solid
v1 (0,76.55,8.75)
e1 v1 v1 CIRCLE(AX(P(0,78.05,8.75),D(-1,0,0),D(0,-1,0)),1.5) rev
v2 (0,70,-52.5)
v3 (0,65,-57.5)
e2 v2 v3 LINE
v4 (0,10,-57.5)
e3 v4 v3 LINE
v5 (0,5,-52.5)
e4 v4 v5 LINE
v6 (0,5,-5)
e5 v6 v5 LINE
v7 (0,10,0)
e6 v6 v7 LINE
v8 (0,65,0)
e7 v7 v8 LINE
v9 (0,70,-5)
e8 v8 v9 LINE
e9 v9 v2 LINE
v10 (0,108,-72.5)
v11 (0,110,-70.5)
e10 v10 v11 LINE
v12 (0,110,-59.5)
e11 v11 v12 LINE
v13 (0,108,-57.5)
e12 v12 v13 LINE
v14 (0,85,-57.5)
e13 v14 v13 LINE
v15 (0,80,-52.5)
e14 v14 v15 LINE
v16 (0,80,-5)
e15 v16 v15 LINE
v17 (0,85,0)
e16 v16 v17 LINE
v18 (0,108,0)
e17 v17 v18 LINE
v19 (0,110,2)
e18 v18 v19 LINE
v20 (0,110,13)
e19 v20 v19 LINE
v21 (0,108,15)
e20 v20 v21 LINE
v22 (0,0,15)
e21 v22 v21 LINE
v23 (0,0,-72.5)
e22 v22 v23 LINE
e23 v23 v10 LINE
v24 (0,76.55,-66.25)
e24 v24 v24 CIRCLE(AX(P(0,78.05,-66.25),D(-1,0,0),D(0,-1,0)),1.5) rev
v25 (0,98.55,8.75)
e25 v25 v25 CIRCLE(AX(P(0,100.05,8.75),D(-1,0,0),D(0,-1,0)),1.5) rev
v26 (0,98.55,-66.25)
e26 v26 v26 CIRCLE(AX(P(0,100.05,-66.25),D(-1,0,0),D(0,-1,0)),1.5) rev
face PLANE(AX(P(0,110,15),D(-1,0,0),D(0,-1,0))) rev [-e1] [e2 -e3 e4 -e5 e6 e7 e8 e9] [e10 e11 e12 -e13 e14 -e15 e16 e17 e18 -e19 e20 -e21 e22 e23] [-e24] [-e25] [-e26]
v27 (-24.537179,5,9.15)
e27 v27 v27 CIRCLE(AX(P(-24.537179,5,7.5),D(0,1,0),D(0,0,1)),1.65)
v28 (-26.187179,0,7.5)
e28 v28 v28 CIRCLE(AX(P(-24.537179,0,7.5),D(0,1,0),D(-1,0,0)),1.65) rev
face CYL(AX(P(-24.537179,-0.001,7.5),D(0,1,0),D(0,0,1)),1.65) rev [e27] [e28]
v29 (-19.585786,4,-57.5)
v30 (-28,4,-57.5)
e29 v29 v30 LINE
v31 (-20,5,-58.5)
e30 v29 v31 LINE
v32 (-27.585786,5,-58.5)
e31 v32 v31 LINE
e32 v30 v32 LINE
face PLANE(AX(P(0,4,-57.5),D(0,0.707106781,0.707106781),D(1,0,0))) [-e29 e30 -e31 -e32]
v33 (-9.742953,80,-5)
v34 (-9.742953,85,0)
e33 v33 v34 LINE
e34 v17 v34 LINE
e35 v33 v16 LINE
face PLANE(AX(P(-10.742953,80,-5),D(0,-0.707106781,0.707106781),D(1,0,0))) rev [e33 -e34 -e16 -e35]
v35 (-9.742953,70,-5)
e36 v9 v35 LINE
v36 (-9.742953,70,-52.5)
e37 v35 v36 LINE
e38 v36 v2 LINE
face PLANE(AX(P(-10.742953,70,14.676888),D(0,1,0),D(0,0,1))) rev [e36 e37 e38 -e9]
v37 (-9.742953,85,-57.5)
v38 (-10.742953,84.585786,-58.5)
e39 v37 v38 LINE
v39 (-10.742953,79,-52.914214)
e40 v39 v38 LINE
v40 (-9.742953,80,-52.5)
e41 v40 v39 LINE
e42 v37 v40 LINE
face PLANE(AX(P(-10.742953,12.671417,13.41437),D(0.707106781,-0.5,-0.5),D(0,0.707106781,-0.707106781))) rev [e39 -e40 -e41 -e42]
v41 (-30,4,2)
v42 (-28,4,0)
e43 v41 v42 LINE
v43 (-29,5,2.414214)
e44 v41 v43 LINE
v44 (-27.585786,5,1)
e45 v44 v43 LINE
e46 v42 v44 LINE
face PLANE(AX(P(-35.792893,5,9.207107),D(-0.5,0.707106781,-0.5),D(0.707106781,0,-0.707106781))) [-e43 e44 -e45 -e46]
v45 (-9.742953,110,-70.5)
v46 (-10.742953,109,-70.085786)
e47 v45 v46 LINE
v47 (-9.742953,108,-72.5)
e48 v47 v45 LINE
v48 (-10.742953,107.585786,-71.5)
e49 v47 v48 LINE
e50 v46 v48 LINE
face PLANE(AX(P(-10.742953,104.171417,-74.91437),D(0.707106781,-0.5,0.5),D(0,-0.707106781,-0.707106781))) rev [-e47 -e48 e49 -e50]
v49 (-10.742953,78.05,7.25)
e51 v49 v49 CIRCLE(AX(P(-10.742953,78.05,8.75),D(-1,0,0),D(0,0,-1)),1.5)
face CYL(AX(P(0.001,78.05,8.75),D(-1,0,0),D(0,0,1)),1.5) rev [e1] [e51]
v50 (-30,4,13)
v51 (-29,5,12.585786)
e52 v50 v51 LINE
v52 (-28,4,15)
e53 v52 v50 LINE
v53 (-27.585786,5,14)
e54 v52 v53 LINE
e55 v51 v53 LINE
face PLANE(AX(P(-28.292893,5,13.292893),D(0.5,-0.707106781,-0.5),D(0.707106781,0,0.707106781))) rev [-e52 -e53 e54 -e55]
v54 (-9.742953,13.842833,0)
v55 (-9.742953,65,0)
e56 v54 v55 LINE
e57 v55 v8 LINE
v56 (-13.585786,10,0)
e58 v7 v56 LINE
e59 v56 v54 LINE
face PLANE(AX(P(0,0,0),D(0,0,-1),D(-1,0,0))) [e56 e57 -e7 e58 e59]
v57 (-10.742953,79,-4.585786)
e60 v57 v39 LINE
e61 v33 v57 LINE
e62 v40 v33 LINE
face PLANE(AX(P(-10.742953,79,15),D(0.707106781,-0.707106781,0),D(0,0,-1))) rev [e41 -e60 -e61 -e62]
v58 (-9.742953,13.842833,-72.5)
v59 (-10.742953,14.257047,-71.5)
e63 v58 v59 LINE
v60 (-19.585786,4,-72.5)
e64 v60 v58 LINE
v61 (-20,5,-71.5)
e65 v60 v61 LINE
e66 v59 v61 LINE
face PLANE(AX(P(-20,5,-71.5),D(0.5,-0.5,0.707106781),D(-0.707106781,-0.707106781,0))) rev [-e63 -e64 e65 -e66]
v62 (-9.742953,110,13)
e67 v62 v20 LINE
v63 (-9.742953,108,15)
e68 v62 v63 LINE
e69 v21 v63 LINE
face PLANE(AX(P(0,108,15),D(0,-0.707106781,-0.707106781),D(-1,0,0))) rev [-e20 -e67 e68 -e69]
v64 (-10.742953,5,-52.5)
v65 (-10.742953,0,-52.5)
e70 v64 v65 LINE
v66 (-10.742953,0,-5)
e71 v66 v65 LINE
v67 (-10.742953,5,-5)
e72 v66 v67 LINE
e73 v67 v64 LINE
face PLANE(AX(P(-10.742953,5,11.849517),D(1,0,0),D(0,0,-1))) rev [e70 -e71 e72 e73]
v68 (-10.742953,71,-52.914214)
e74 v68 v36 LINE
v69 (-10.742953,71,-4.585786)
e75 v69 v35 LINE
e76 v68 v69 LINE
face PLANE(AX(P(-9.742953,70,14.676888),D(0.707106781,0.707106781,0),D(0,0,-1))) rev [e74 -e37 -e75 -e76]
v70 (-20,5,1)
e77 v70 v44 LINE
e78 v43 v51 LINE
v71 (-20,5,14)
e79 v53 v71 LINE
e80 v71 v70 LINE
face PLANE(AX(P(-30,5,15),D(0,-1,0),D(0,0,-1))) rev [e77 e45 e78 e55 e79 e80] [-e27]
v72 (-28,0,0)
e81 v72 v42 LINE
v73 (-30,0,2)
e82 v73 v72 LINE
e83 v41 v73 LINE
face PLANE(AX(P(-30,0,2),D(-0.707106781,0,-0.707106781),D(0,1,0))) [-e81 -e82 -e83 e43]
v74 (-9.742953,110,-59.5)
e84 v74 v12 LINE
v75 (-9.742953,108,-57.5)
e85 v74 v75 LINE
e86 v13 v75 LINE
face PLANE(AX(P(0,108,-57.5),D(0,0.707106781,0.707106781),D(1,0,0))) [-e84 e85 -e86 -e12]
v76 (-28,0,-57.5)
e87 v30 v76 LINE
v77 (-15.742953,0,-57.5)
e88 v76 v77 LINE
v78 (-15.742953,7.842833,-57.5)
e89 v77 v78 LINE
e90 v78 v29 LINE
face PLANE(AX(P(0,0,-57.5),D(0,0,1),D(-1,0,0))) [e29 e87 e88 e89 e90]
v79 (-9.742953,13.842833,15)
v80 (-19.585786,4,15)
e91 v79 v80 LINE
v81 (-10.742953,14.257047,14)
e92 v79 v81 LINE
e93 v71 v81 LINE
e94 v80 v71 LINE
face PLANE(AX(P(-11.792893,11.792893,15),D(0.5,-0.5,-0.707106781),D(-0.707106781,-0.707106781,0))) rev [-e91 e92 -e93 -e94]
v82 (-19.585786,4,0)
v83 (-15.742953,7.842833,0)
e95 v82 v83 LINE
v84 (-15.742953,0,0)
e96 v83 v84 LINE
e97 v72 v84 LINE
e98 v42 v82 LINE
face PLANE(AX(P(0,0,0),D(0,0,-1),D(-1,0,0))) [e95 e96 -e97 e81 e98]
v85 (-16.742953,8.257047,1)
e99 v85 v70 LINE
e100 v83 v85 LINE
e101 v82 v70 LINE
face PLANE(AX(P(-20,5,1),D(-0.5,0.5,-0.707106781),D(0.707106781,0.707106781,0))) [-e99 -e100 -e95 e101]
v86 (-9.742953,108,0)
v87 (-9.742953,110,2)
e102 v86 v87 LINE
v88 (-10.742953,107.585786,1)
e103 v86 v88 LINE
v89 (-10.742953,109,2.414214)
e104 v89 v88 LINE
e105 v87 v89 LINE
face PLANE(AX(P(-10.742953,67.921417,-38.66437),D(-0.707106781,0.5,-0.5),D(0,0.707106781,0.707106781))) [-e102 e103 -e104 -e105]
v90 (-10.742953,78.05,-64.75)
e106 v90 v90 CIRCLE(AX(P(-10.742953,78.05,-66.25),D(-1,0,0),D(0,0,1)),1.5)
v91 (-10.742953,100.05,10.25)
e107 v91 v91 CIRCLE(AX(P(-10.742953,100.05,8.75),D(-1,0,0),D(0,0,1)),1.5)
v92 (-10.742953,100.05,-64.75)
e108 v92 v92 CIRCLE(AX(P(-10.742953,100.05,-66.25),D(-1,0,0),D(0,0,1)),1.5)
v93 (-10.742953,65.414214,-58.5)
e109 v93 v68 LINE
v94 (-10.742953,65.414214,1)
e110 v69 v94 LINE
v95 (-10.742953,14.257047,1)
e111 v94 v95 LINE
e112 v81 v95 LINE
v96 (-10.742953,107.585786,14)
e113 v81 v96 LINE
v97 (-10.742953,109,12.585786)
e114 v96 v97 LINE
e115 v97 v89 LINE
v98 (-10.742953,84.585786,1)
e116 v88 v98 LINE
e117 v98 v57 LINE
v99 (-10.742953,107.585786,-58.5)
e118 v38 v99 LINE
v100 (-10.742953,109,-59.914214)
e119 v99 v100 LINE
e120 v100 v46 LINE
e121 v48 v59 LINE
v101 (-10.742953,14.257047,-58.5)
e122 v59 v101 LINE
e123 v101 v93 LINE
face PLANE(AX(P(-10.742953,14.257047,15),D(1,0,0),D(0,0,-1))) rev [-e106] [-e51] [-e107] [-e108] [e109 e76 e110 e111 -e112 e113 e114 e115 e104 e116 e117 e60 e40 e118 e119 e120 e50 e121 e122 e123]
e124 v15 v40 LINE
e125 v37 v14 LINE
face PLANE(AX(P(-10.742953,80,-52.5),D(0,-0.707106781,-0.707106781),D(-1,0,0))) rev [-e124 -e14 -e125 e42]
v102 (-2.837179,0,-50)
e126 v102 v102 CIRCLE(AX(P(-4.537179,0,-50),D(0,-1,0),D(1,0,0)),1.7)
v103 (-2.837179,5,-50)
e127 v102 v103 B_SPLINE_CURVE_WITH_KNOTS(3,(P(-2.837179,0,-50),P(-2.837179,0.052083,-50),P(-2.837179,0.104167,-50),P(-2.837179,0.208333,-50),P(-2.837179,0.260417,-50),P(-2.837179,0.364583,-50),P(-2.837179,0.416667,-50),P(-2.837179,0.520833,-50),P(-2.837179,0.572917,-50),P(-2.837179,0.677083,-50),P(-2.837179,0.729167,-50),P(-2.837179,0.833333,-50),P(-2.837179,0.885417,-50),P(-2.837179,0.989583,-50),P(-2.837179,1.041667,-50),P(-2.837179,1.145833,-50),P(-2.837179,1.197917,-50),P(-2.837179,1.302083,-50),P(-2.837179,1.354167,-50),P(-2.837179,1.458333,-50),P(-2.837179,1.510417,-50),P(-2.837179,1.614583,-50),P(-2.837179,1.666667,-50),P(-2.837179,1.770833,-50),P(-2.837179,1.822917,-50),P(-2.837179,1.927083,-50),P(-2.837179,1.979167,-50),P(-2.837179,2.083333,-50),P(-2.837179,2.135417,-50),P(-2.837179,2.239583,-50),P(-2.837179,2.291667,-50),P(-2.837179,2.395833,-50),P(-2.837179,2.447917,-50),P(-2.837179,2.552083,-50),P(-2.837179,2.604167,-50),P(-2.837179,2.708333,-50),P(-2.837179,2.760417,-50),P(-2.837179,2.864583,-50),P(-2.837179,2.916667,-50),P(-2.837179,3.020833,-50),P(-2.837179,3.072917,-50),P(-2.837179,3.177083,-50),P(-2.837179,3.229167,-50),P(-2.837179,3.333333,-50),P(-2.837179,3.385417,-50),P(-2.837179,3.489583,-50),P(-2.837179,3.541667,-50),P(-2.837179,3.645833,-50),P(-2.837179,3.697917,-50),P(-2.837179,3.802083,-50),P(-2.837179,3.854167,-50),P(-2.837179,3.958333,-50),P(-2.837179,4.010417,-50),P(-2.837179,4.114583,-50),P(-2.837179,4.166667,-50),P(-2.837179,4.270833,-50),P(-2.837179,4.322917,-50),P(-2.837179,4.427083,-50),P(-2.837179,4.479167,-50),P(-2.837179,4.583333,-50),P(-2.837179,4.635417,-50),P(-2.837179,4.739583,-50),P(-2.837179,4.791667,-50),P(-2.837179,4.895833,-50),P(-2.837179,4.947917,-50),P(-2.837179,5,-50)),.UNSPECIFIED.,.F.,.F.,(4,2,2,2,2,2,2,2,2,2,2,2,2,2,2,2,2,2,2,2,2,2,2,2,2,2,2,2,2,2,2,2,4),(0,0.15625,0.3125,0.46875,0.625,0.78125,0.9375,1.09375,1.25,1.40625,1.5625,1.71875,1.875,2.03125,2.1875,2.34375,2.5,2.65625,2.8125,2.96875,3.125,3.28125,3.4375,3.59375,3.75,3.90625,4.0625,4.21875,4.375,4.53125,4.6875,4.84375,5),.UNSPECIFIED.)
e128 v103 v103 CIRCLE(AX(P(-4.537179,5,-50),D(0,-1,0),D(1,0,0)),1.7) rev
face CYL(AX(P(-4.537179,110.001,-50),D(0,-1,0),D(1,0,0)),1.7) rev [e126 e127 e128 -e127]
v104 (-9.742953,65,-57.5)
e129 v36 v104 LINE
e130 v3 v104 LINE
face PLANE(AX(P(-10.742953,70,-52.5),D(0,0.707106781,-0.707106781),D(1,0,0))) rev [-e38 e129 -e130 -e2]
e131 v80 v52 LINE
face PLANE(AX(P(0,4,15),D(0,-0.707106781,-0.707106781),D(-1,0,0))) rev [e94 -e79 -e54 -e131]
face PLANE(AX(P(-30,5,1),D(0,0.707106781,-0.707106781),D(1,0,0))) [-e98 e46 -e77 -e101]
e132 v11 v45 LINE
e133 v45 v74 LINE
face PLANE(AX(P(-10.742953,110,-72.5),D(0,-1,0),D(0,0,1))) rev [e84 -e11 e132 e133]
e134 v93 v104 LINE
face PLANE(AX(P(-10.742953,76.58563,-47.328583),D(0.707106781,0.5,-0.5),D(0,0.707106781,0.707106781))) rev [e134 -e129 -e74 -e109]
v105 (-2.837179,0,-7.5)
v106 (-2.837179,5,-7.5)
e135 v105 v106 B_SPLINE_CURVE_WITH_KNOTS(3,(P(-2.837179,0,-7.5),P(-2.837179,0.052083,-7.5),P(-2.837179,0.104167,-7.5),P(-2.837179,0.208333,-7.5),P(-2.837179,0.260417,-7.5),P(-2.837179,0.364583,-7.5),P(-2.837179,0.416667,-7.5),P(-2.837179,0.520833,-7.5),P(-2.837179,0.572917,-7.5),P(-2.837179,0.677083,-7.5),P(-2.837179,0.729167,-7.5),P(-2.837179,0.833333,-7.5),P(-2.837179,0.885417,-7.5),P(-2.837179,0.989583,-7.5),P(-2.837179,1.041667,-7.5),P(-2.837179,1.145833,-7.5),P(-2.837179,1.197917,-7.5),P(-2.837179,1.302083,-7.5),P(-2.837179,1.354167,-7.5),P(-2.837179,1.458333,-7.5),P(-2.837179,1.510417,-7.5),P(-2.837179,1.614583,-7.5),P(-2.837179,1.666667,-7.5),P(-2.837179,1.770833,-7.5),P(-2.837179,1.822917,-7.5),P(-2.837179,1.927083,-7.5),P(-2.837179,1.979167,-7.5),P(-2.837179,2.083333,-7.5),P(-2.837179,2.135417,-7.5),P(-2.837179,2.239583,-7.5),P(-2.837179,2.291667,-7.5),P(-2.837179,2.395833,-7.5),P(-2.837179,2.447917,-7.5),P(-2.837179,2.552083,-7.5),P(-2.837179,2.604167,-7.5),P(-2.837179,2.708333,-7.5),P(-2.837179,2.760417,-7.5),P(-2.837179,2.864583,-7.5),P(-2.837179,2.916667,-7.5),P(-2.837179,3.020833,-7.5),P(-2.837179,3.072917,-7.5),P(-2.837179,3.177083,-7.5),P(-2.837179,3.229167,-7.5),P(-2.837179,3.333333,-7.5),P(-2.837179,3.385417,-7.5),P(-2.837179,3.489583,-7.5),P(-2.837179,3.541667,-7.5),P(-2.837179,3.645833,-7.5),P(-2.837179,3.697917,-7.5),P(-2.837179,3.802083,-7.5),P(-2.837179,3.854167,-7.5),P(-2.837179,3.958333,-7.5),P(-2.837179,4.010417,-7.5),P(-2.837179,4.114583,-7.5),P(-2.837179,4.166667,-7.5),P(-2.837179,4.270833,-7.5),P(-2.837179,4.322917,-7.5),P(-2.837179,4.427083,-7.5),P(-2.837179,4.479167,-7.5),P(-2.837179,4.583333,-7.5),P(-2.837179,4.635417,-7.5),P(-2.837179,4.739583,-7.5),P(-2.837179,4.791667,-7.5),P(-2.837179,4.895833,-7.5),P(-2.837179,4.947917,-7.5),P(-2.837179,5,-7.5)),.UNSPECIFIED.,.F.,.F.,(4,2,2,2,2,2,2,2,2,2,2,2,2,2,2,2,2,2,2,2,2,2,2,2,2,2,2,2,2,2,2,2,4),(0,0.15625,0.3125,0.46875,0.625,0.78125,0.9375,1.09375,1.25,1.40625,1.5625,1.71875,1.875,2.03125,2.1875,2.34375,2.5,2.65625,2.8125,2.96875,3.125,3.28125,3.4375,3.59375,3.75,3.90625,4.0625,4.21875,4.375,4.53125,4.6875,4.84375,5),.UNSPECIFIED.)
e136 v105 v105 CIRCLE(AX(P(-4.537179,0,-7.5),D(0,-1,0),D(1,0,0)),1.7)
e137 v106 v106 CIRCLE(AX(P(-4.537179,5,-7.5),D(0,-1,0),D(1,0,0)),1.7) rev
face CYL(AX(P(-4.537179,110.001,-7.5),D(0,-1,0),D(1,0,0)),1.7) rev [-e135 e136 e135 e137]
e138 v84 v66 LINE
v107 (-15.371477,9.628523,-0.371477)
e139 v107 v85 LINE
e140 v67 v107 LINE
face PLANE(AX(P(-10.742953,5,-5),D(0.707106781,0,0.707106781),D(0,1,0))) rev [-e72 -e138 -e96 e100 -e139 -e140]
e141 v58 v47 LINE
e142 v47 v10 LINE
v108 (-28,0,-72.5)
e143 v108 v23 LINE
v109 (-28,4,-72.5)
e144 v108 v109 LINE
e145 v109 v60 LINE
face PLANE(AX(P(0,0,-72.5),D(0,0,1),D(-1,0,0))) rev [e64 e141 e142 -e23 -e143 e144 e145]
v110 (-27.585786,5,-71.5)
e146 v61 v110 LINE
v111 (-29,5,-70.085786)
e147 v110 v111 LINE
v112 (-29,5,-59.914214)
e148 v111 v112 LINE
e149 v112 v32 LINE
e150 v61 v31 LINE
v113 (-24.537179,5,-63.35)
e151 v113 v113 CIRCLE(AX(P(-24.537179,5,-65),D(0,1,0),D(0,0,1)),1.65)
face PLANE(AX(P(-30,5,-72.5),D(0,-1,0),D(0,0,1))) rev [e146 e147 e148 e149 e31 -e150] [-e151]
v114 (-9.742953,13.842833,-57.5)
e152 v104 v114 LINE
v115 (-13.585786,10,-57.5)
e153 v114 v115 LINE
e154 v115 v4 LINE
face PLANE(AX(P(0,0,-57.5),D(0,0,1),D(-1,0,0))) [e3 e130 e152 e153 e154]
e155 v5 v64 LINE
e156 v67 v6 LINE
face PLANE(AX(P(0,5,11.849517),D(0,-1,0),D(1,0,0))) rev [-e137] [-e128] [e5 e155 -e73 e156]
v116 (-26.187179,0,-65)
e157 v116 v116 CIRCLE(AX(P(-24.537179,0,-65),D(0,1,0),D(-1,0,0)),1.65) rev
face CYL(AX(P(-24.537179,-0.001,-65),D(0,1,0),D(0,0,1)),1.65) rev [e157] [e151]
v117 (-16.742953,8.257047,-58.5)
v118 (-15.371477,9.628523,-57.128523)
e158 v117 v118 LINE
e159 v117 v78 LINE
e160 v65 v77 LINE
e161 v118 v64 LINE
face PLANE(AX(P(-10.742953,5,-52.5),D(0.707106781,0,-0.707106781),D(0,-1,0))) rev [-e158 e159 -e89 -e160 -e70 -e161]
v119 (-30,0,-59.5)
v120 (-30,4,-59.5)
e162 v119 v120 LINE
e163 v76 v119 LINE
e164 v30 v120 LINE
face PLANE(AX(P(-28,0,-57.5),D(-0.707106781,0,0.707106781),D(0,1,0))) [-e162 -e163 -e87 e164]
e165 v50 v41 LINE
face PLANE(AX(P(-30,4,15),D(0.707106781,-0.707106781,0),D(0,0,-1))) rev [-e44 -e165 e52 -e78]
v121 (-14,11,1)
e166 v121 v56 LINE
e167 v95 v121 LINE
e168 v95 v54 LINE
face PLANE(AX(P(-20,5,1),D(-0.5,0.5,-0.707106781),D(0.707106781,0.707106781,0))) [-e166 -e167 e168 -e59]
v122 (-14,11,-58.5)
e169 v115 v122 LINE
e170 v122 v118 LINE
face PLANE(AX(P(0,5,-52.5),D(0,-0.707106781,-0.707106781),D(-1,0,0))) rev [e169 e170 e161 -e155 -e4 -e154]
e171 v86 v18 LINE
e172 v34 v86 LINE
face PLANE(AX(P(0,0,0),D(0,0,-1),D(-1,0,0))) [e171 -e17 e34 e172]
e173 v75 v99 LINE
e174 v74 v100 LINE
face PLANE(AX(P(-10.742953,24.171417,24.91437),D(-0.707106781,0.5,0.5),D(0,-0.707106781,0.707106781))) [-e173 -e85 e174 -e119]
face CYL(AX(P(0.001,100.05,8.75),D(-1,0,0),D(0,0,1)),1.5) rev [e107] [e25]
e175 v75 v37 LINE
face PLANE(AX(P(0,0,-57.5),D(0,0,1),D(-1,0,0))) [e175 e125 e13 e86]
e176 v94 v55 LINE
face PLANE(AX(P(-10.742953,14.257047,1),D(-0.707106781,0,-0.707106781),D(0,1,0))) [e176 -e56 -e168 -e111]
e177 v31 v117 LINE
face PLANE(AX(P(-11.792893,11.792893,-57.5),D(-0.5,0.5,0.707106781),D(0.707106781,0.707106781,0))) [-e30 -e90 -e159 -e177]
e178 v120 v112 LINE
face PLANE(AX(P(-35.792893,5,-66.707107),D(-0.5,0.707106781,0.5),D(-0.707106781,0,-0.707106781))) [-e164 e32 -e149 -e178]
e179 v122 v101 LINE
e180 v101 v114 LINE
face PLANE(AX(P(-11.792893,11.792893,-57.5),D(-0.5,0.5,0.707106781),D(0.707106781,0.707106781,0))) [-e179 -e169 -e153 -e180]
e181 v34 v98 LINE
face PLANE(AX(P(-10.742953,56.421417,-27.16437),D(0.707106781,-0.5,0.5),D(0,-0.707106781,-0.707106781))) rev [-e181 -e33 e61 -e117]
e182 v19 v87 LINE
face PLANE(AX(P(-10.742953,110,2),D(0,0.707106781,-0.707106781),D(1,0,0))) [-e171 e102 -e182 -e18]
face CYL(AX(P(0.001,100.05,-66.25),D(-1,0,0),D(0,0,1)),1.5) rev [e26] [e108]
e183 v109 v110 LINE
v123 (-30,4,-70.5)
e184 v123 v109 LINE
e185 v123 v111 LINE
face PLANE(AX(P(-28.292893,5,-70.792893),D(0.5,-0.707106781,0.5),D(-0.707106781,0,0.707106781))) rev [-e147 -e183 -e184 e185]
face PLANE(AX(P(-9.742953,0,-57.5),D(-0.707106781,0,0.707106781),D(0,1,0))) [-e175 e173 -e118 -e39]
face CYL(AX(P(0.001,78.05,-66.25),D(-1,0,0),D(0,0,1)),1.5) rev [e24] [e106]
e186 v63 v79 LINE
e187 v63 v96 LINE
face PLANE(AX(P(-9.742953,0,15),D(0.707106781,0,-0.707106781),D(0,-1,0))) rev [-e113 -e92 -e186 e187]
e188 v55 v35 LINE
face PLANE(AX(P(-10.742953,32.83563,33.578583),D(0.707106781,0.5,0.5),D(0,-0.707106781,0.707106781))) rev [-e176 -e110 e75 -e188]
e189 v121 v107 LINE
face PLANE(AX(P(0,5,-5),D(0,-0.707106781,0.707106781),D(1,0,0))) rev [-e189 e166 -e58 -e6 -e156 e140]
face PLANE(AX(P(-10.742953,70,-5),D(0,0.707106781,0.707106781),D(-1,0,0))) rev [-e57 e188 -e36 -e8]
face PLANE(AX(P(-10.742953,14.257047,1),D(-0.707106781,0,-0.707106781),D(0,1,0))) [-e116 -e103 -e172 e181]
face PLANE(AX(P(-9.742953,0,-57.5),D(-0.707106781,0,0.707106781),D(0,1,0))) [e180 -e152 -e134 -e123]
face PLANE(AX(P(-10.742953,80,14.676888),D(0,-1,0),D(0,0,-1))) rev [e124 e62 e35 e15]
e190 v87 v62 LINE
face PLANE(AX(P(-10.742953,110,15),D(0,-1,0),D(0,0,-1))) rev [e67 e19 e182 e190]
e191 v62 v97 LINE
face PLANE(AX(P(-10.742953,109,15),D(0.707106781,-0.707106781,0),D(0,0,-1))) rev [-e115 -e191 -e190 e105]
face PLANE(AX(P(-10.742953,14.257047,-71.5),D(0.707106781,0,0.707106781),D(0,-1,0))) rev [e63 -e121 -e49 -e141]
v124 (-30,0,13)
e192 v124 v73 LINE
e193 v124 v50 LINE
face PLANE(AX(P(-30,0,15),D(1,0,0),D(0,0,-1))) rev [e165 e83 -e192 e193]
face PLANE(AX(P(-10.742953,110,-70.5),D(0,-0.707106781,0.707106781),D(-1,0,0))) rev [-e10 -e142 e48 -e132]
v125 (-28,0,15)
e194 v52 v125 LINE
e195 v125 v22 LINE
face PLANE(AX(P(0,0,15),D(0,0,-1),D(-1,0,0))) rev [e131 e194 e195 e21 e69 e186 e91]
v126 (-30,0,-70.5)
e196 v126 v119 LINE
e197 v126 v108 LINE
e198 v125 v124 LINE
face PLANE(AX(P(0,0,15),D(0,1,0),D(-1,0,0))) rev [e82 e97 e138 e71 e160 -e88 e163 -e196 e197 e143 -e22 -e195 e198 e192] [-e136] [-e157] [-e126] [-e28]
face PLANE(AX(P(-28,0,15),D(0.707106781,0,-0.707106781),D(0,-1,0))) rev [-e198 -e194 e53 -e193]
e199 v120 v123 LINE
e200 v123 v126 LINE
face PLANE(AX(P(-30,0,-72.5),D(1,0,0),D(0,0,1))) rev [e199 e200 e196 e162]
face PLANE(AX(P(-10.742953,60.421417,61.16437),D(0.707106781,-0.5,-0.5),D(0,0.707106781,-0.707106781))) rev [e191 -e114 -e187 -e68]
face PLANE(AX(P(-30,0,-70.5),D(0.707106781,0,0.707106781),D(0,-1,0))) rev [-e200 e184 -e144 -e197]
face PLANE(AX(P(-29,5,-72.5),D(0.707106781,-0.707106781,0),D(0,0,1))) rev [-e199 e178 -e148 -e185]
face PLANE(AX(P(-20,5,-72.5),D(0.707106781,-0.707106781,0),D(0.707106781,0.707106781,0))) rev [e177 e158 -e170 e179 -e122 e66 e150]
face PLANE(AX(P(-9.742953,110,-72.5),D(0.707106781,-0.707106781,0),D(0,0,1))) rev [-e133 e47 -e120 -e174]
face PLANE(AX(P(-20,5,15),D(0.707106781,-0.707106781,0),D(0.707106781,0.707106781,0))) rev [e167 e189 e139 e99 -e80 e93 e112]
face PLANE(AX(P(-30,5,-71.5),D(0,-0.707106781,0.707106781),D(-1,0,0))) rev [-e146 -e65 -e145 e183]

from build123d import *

# Parameters (mm, degrees)
EXTRUDE_1_DEPTH     = 15
SKETCH_3_W          = 10.742953118
SKETCH_3_H          = 10
EXTRUDE_2_DEPTH     = 57.5
SKETCH_4_W          = 10.742953118
SKETCH_4_H          = 5
EXTRUDE_3_DEPTH     = 57.5
CUT_EXTRUDE_1_REACH = 133.077
SKETCH_5_R          = 1.65
CUT_EXTRUDE_2_REACH = 137.116
SKETCH_6_R          = 1.7
CUT_EXTRUDE_3_REACH = 135.143
SKETCH_7_R          = 1.5
CHAMFER_1_SIZE      = 5
CHAMFER_2_SIZE      = 2
CHAMFER_3_SIZE      = 5
CHAMFER_4_SIZE      = 1


with BuildPart() as part:
    # 草图1 → 凸台-拉伸1 (new body)
    with BuildSketch(Plane.XY):
        Polygon((0, 110), (0, 0), (-30, 0), (-30, 5), (-20, 5), (-10.742953118, 14.257046882), (-10.742953118, 110), align=None)
    extrude(amount=EXTRUDE_1_DEPTH)


with BuildPart() as body_2:
    # 镜向9: mirrored copy
    add(part.part.mirror(Plane.XY.offset(-28.75)))


with BuildPart() as part_1:
    add(part.part)

    add(body_2.part)  # 凸台-拉伸2 merges body 2
    # 草图3 → 凸台-拉伸2 (add)
    with BuildSketch(Plane.XY.offset(-57.5)):
        with Locations((-5.371476559, 75)):
            Rectangle(SKETCH_3_W, SKETCH_3_H)
    extrude(amount=EXTRUDE_2_DEPTH)

    # 草图4 → 凸台-拉伸3 (add)
    with BuildSketch(Plane.XY.offset(-57.5)):
        with Locations((-5.371476559, 2.5)):
            Rectangle(SKETCH_4_W, SKETCH_4_H)
    extrude(amount=EXTRUDE_3_DEPTH)

    # 草图5 → 切除-拉伸1 (cut, up to next)
    with BuildSketch(Plane(origin=(0, 5, 0), x_dir=(1, 0, 0), z_dir=(0, 1, 0)), mode=Mode.PRIVATE) as cut_extrude_1_sk1:
        with Locations(Location((-24.537178605, 65, 0), (0, 0, 270))):
            Circle(SKETCH_5_R)
    cut_extrude_1_tool1 = extrude(cut_extrude_1_sk1.sketch, amount=-CUT_EXTRUDE_1_REACH, mode=Mode.PRIVATE) & part_1.part
    # 草图5 → 切除-拉伸1 (cut, up to next)
    with BuildSketch(Plane(origin=(0, 5, 0), x_dir=(1, 0, 0), z_dir=(0, 1, 0)), mode=Mode.PRIVATE) as cut_extrude_1_sk2:
        with Locations(Location((-24.537178605, -7.5, 0), (0, 0, 270))):
            Circle(SKETCH_5_R)
    cut_extrude_1_tool2 = extrude(cut_extrude_1_sk2.sketch, amount=-CUT_EXTRUDE_1_REACH, mode=Mode.PRIVATE) & part_1.part
    add(cut_extrude_1_tool1.solids().sort_by_distance((-24.537179, 5, -65))[0], mode=Mode.SUBTRACT)
    add(cut_extrude_1_tool2.solids().sort_by_distance((-24.537179, 5, 7.5))[0], mode=Mode.SUBTRACT)

    # 草图6 → 切除-拉伸2 (cut, up to next)
    with BuildSketch(Plane.XZ, mode=Mode.PRIVATE) as cut_extrude_2_sk1:
        with Locations((-4.537178605, -7.5)):
            Circle(SKETCH_6_R)
    cut_extrude_2_tool1 = extrude(cut_extrude_2_sk1.sketch, amount=-CUT_EXTRUDE_2_REACH, mode=Mode.PRIVATE) & part_1.part
    # 草图6 → 切除-拉伸2 (cut, up to next)
    with BuildSketch(Plane.XZ, mode=Mode.PRIVATE) as cut_extrude_2_sk2:
        with Locations((-4.537178605, -50)):
            Circle(SKETCH_6_R)
    cut_extrude_2_tool2 = extrude(cut_extrude_2_sk2.sketch, amount=-CUT_EXTRUDE_2_REACH, mode=Mode.PRIVATE) & part_1.part
    add(cut_extrude_2_tool1.solids().sort_by_distance((-4.537179, 0, -7.5))[0], mode=Mode.SUBTRACT)
    add(cut_extrude_2_tool2.solids().sort_by_distance((-4.537179, 0, -50))[0], mode=Mode.SUBTRACT)

    # 草图7 → 切除-拉伸3 (cut, up to next)
    with BuildSketch(Plane.ZY.offset(10.742953118), mode=Mode.PRIVATE) as cut_extrude_3_sk1:
        with Locations((-66.25, 100.05)):
            Circle(SKETCH_7_R)
    cut_extrude_3_tool1 = extrude(cut_extrude_3_sk1.sketch, amount=-CUT_EXTRUDE_3_REACH, mode=Mode.PRIVATE) & part_1.part
    # 草图7 → 切除-拉伸3 (cut, up to next)
    with BuildSketch(Plane.ZY.offset(10.742953118), mode=Mode.PRIVATE) as cut_extrude_3_sk2:
        with Locations((8.75, 100.05)):
            Circle(SKETCH_7_R)
    cut_extrude_3_tool2 = extrude(cut_extrude_3_sk2.sketch, amount=-CUT_EXTRUDE_3_REACH, mode=Mode.PRIVATE) & part_1.part
    # 草图7 → 切除-拉伸3 (cut, up to next)
    with BuildSketch(Plane.ZY.offset(10.742953118), mode=Mode.PRIVATE) as cut_extrude_3_sk3:
        with Locations((-66.25, 78.05)):
            Circle(SKETCH_7_R)
    cut_extrude_3_tool3 = extrude(cut_extrude_3_sk3.sketch, amount=-CUT_EXTRUDE_3_REACH, mode=Mode.PRIVATE) & part_1.part
    # 草图7 → 切除-拉伸3 (cut, up to next)
    with BuildSketch(Plane.ZY.offset(10.742953118), mode=Mode.PRIVATE) as cut_extrude_3_sk4:
        with Locations(Location((8.75, 78.05, 0), (0, 0, 270))):
            Circle(SKETCH_7_R)
    cut_extrude_3_tool4 = extrude(cut_extrude_3_sk4.sketch, amount=-CUT_EXTRUDE_3_REACH, mode=Mode.PRIVATE) & part_1.part
    add(cut_extrude_3_tool1.solids().sort_by_distance((-10.742953, 100.05, -66.25))[0], mode=Mode.SUBTRACT)
    add(cut_extrude_3_tool2.solids().sort_by_distance((-10.742953, 100.05, 8.75))[0], mode=Mode.SUBTRACT)
    add(cut_extrude_3_tool3.solids().sort_by_distance((-10.742953, 78.05, -66.25))[0], mode=Mode.SUBTRACT)
    add(cut_extrude_3_tool4.solids().sort_by_distance((-10.742953, 78.05, 8.75))[0], mode=Mode.SUBTRACT)

    # 倒角1
    chamfer_1_edges = [part_1.edges().sort_by_distance(p)[0] for p in [
        (-5.371476559, 80, 0),
        (-5.371476559, 80, -57.5),
        (-5.371476559, 70, 0),
        (-5.371476559, 70, -57.5),
        (-5.371476559, 5, 0),
        (-5.371476559, 5, -57.5),
    ]]
    chamfer(chamfer_1_edges, length=CHAMFER_1_SIZE)

    # 倒角2
    chamfer_2_edges = [part_1.edges().sort_by_distance(p)[0] for p in [
        (-5.371476559, 110, 0),
        (-30, 2.5, 15),
        (-5.371476559, 110, -57.5),
        (-30, 2.5, -57.5),
        (-5.371476559, 110, -72.5),
        (-30, 2.5, -72.5),
        (-5.371476559, 110, 15),
        (-30, 2.5, 0),
    ]]
    chamfer(chamfer_2_edges, length=CHAMFER_2_SIZE)

    # 倒角3
    # the kernel refuses this chamfer: 5 mm, written as the material it adds along each edge
    with BuildSketch(Plane(origin=(-10.742953118, 22.85841494, 0), x_dir=(-0.9996219169112968, 0, 0.027495876610586372), z_dir=(0, -1, 0))) as chamfer_3_piece_1_section:
        Polygon((CHAMFER_3_SIZE * 0.999621916911, CHAMFER_3_SIZE * 0.0274958766106), (-CHAMFER_3_SIZE * 0.0274958766106, CHAMFER_3_SIZE * 0.999621916911), (0, 0), align=None)
    chamfer_3_piece_1 = extrude(amount=22.85841494, mode=Mode.PRIVATE)
    chamfer_3_piece_1 = split(chamfer_3_piece_1, bisect_by=Plane(origin=(-12.636913345, 5, -1.178868923), z_dir=(0, 1, 0)), keep=Keep.TOP, mode=Mode.PRIVATE)
    chamfer_3_piece_1 = split(chamfer_3_piece_1, bisect_by=Plane(origin=(-12.636913345, 7.862667434, -2.137332566), z_dir=(0, -0.7071067811865476, 0.7071067811865476)), keep=Keep.TOP, mode=Mode.PRIVATE)
    chamfer_3_piece_1 = split(chamfer_3_piece_1, bisect_by=Plane(origin=(-15.366354777, 9.633645223, -1.178868923), z_dir=(0.7071067811865488, -0.7071067811865464, 0)), keep=Keep.TOP, mode=Mode.PRIVATE)
    add(chamfer_3_piece_1)
    with BuildSketch(Plane(origin=(-10.742953118, 22.85841494, 0), x_dir=(-0.9996219169112968, 0, 0.027495876610586372), z_dir=(0, -1, 0))) as chamfer_3_piece_2_section:
        Polygon((CHAMFER_3_SIZE * 0.999621916911, CHAMFER_3_SIZE * 0.0274958766106), (-CHAMFER_3_SIZE * 0.0274958766106, CHAMFER_3_SIZE * 0.999621916911), (0, 0), align=None)
    chamfer_3_piece_2 = extrude(amount=22.85841494, mode=Mode.PRIVATE)
    chamfer_3_piece_2 = split(chamfer_3_piece_2, bisect_by=Plane(origin=(-12.391958981, 5, -1.648896507), z_dir=(0, -1, 0)), keep=Keep.TOP, mode=Mode.PRIVATE)
    chamfer_3_piece_2 = split(chamfer_3_piece_2, bisect_by=Plane(origin=(-12.391958981, 5.425526159, -4.574473841), z_dir=(0, -0.7071067811865476, 0.7071067811865476)), keep=Keep.TOP, mode=Mode.PRIVATE)
    add(chamfer_3_piece_2)
    with BuildSketch(Plane(origin=(-10.742953118, 0, -57.5), x_dir=(-0.9996219169112968, 0, -0.027495876610586317), z_dir=(0, 1, 0))) as chamfer_3_piece_3_section:
        Polygon((CHAMFER_3_SIZE * 0.999621916911, CHAMFER_3_SIZE * 0.0274958766106), (-CHAMFER_3_SIZE * 0.0274958766106, CHAMFER_3_SIZE * 0.999621916911), (0, 0), align=None)
    chamfer_3_piece_3 = extrude(amount=22.85841494, mode=Mode.PRIVATE)
    chamfer_3_piece_3 = split(chamfer_3_piece_3, bisect_by=Plane(origin=(-12.391958981, 5.425526159, -52.925526159), z_dir=(0, -0.7071067811865476, -0.7071067811865476)), keep=Keep.TOP, mode=Mode.PRIVATE)
    chamfer_3_piece_3 = split(chamfer_3_piece_3, bisect_by=Plane(origin=(-12.391958981, 5, -55.851103493), z_dir=(0, -1, 0)), keep=Keep.TOP, mode=Mode.PRIVATE)
    add(chamfer_3_piece_3)
    with BuildSketch(Plane(origin=(-10.742953118, 0, -57.5), x_dir=(-0.9996219169112968, 0, -0.027495876610586317), z_dir=(0, 1, 0))) as chamfer_3_piece_4_section:
        Polygon((CHAMFER_3_SIZE * 0.999621916911, CHAMFER_3_SIZE * 0.0274958766106), (-CHAMFER_3_SIZE * 0.0274958766106, CHAMFER_3_SIZE * 0.999621916911), (0, 0), align=None)
    chamfer_3_piece_4 = extrude(amount=22.85841494, mode=Mode.PRIVATE)
    chamfer_3_piece_4 = split(chamfer_3_piece_4, bisect_by=Plane(origin=(-12.636913345, 7.862667434, -55.362667434), z_dir=(0, -0.7071067811865476, -0.7071067811865476)), keep=Keep.TOP, mode=Mode.PRIVATE)
    chamfer_3_piece_4 = split(chamfer_3_piece_4, bisect_by=Plane(origin=(-15.366354777, 9.633645223, -56.321131077), z_dir=(0.7071067811865488, -0.7071067811865464, 0)), keep=Keep.TOP, mode=Mode.PRIVATE)
    chamfer_3_piece_4 = split(chamfer_3_piece_4, bisect_by=Plane(origin=(-12.636913345, 5, -56.321131077), z_dir=(0, 1, 0)), keep=Keep.TOP, mode=Mode.PRIVATE)
    add(chamfer_3_piece_4)

    # 倒角4
    chamfer_4_edges = [part_1.edges().sort_by_distance(p)[0] for p in [
        (-10.742953118, 39.628523441, 0),
        (-10.742953118, 39.628523441, -57.5),
        (-10.742953118, 70, -28.75),
        (-10.742953118, 80, -28.75),
        (-10.742953118, 67.5, -55),
        (-10.742953118, 67.5, -2.5),
        (-10.742953118, 82.5, -2.5),
        (-10.742953118, 82.5, -55),
        (-15.371476559, 9.628523441, 15),
        (-10.742953118, 61.128523441, 15),
        (-24, 5, 15),
        (-30, 5, 7.5),
        (-29, 5, 1),
        (-29, 5, 14),
        (-30, 5, -65),
        (-29, 5, -71.5),
        (-29, 5, -58.5),
        (-10.742953118, 61.128523441, -72.5),
        (-10.742953118, 96.5, 0),
        (-10.742953118, 96.5, -57.5),
        (-10.742953118, 110, -65),
        (-10.742953118, 110, 7.5),
        (-10.742953118, 109, -71.5),
        (-10.742953118, 109, -58.5),
        (-10.742953118, 109, 1),
        (-10.742953118, 109, 14),
        (-17.871476559, 7.128523441, 0),
        (-17.871476559, 7.128523441, -57.5),
        (-12.871476559, 12.128523441, -57.5),
        (-24, 5, -57.5),
        (-15.371476559, 9.628523441, -72.5),
        (-24, 5, -72.5),
        (-24, 5, 0),
        (-12.871476559, 12.128523441, 0),
    ]]
    chamfer(chamfer_4_edges, length=CHAMFER_4_SIZE)


solid = part_1.part
